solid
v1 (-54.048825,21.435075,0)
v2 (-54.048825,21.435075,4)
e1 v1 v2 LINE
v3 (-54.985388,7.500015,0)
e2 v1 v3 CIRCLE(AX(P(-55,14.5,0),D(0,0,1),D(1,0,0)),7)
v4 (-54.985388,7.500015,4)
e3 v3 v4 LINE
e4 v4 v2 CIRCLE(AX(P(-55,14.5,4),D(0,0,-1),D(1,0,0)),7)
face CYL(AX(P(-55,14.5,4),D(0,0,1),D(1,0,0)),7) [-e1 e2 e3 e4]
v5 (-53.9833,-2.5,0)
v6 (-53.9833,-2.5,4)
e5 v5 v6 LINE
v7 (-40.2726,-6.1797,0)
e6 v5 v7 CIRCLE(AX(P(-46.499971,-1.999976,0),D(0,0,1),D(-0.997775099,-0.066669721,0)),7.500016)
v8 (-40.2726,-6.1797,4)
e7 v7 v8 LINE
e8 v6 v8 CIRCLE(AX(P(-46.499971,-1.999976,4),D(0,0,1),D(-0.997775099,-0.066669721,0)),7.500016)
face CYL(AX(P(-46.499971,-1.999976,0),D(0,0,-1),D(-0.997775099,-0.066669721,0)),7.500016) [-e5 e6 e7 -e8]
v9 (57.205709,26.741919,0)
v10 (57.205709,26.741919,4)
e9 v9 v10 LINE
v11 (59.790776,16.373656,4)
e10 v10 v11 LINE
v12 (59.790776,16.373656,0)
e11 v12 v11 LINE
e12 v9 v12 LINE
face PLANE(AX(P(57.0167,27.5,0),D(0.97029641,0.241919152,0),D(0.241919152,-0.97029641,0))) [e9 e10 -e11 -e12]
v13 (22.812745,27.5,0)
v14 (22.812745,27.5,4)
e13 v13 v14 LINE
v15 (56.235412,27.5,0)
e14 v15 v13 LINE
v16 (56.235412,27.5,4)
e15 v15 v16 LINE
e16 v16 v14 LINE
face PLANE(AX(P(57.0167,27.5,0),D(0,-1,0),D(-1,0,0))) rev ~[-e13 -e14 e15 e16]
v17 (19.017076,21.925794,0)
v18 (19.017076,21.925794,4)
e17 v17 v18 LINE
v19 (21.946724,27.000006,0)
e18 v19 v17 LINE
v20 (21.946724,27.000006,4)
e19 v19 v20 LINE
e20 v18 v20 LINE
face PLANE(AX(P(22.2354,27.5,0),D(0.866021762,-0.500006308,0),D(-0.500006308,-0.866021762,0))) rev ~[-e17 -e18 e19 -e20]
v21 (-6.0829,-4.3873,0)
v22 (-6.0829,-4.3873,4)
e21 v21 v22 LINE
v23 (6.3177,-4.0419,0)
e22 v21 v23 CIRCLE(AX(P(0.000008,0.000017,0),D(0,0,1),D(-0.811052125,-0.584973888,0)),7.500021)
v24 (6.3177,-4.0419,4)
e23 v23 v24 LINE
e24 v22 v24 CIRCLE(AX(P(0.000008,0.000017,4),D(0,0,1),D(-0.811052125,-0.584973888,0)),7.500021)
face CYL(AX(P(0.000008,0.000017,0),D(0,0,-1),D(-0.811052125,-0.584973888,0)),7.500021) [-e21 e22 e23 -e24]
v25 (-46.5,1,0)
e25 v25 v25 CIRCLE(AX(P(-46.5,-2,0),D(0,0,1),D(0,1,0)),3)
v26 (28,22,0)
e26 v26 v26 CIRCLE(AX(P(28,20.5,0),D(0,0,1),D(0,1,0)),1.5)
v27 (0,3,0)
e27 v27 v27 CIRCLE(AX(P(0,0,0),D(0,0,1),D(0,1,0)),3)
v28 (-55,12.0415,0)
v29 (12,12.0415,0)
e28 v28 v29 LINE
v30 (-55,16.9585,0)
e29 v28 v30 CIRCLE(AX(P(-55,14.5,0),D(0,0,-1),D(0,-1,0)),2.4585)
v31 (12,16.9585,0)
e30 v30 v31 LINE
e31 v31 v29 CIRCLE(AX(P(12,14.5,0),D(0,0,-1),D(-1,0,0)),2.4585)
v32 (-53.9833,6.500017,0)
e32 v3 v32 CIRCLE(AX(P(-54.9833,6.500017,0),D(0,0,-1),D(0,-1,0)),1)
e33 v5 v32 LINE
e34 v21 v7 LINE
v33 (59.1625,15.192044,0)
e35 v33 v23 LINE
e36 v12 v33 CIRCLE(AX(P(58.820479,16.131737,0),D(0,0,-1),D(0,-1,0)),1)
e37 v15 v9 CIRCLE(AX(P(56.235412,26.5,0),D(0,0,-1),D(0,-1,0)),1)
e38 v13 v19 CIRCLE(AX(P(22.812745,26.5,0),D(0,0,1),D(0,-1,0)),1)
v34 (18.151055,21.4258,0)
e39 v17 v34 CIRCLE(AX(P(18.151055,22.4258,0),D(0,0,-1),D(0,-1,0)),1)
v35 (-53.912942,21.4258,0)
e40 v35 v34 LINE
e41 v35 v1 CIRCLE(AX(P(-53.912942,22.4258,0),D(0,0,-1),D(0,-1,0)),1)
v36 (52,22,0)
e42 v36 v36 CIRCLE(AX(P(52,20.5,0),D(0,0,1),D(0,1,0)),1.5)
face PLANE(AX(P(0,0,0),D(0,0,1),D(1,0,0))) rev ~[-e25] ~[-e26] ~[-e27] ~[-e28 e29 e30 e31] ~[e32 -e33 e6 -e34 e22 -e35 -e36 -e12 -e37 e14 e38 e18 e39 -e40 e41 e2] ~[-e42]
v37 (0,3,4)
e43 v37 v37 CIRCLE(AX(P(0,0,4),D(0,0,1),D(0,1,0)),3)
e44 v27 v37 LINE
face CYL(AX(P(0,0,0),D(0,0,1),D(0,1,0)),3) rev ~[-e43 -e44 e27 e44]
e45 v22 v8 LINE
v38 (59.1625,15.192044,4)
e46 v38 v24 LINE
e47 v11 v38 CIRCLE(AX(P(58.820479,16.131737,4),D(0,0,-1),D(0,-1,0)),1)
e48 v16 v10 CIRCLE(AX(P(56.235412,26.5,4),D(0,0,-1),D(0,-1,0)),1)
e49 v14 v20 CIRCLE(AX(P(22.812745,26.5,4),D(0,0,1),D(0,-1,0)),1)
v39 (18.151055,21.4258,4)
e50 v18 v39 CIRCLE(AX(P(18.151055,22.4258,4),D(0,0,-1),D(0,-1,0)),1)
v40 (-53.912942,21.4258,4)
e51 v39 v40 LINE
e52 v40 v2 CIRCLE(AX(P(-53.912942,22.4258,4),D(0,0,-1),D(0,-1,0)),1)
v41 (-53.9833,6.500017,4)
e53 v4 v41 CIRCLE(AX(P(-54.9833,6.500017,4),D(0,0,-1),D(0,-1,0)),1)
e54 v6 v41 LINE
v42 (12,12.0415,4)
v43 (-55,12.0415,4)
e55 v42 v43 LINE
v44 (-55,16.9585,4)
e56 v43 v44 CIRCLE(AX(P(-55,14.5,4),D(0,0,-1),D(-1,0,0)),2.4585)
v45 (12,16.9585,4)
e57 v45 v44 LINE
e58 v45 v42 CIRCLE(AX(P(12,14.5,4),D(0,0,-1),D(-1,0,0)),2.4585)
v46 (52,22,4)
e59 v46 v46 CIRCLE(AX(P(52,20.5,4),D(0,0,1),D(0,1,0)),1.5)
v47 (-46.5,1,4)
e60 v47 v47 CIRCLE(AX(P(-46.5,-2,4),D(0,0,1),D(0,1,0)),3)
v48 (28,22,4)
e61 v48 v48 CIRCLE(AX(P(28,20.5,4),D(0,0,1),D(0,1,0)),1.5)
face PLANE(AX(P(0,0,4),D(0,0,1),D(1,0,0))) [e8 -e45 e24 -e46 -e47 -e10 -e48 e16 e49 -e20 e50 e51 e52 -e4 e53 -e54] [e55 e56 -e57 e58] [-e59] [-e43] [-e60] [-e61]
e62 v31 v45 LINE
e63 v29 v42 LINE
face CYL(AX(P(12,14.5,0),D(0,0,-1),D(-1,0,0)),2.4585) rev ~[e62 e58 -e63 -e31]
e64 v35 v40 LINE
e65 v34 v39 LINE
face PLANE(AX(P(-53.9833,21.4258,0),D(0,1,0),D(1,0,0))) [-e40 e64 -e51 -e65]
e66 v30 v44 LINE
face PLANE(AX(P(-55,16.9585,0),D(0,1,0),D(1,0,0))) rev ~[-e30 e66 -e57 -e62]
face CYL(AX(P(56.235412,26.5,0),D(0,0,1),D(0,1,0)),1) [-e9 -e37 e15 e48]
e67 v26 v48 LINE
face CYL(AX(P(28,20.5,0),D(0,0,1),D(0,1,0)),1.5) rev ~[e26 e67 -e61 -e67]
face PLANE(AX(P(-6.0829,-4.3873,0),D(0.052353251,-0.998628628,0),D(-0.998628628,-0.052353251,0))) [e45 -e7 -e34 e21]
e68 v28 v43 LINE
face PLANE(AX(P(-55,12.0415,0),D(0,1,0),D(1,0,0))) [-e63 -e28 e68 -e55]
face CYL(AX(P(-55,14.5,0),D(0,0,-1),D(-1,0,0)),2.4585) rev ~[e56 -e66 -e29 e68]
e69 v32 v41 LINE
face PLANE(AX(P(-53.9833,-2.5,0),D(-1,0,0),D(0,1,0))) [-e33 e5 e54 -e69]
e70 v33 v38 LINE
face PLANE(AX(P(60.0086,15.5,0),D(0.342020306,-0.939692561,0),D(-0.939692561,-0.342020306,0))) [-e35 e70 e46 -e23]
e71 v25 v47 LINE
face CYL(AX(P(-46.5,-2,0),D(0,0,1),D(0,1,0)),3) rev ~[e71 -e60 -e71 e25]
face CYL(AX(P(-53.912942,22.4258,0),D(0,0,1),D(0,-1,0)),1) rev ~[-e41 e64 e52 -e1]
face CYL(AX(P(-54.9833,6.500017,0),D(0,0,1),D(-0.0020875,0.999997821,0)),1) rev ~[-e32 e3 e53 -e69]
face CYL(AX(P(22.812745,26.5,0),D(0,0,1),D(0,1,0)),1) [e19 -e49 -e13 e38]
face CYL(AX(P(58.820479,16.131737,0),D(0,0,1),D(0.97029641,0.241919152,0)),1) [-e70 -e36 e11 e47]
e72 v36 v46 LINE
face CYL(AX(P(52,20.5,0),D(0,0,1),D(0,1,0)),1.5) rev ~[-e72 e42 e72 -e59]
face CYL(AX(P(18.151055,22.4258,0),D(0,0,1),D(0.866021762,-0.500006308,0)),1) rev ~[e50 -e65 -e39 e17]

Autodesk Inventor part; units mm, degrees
ref_plane "YZ Plane" through (0, 0, 0) normal (1, 0, 0) x (0, 1, 0)
ref_plane "XZ Plane" through (0, 0, 0) normal (0, 1, 0) x (-1, 0, 0)
ref_plane "XY Plane" through (0, 0, 0) normal (0, 0, 1) x (1, 0, 0)
sketch "Base" plane through (0, 0, 0) normal (0, 0, 1) x (1, 0, 0)
  arc A0 (-53.9833, -2.5) -> (-40.2726, -6.1797) centre (-46.5, -2) ccw
  line L0 (-6.0829, -4.3873) -> (-40.2726, -6.1797)
  arc A1 (-6.0829, -4.3873) -> (6.3177, -4.0419) centre (0, 0) ccw
  line L1 (60.0086, 15.5) -> (6.3177, -4.0419)
  circle A2 centre (52, 20.5) radius 1.5 construction
  circle A3 centre (28, 20.5) radius 1.5 construction
  line L2 (57.0167, 27.5) -> (60.0086, 15.5)
  line L3 (57.0167, 27.5) -> (-53.9833, 27.5)
  line L4 (-53.9833, -2.5) -> (-53.9833, 27.5)
  line L5 (52, 20.5) -> (28, 20.5) construction
  dimension "d3" = 24
  dimension "d4" = 3
  dimension "d7" = 104
  dimension "d16" = 20
  dimension "d17" = 111
  dimension "d19" = 30
  dimension "d22" = 86.999
  dimension "d25" = 28
  dimension "d26" = 7.5
  dimension "d31" = 27.5
  dimension "d32" = 12
  dimension "d45" = 46.5
  dimension "d46" = 2
  dimension "d47" = 4.5
  dimension "d64" = 7
extrude "BaseFeature" add sketch "Base" along normal blind 4
fillet "EndFilletsFeature" radius 1 2 edges at (60.0086, 15.5, 2) (57.0167, 27.5, 2)
sketch "BaseMountHoles" plane through (0, 0, 0) normal (0, 0, -1) x (-1, 0, 0)
  arc A0 (40.2726, -6.1797) -> (53.9833, -2.5) centre (46.5, -2) ccw projected
  point P0 (0, 0)
hole "BaseMountHolesFeature" at (-46.5, -2, 0) at (0, 0, 0) direction (0, 0, 1) diameter 6 end through all
sketch "CuffMountHoles" plane through (0, 0, 0) normal (0, 0, -1) x (-1, 0, 0)
  circle A0 centre (-52, 20.5) radius 1.5 construction
  circle A1 centre (-28, 20.5) radius 1.5 construction
  point P0 (0, 0)
hole "CuffMountHolesFeature" at (52, 20.5, 0) at (28, 20.5, 0) direction (0, 0, 1) diameter 3 end through all
sketch "ExternalAssemblyGeometry" plane through (0, 0, 4) normal (0, 0, 1) x (1, 0, 0)
  circle A0 centre (-4.2211, 14.5) radius 2.4585 construction
  circle A1 centre (-12.2211, 14.5) radius 2.4585 construction
  circle A2 centre (-33.6105, 14.5) radius 2.4585 construction
  circle A3 centre (-55, 14.5) radius 2.4585 construction
  line L0 (16.9953, 21.5) -> (-152.0047, 21.5) construction
  line L1 (-55, 14.5) -> (12, 14.5) construction
  circle A4 centre (-55, 14.5) radius 7
  line L2 (-53.9833, 27.5) -> (56.2354, 27.5) projected
  line L3 (-53.9833, -2.5) -> (-53.9833, 27.5) projected
  dimension "d57" = 67
  dimension "d72" = 14
  dimension "d73" = 6
  dimension "d74" = 169
  dimension "d75" = 4.917
  dimension "d76" = 8
  dimension "d77" = 1.0167
  dimension "d78" = 21.3895
  dimension "d79" = 21.3895
  dimension "d80" = 70.9786
extrude "MountRailEndFeature" add sketch "ExternalAssemblyGeometry" against normal up to surface (4 mm away)
sketch "MountRail" plane through (0, 0, 0) normal (0, 0, -1) x (-1, 0, 0)
  line L0 (55, 14.5) -> (-12, 14.5) construction
  circle A0 centre (55, 14.5) radius 2.4585 construction
  circle A1 centre (-12, 14.5) radius 2.4585
  circle A2 centre (55, 14.5) radius 2.4585
  line L1 (55, 12.0415) -> (-12, 12.0415)
  line L2 (55, 16.9585) -> (-12, 16.9585)
  point P0 (0, 0)
extrude "MountRailFeature" cut sketch "MountRail" against normal through all
sketch "TopAngleCut" plane through (0, 0, 0) normal (0, 0, -1) x (-1, 0, 0)
  line L0 (53.9833, 27.5) -> (-56.2354, 27.5) construction
  line L1 (-22.2354, 27.5) -> (-18.7284, 21.4258)
  line L2 (53.9833, 21.4258) -> (-18.7284, 21.4258)
  line L3 (-22.2354, 27.5) -> (53.9833, 27.5)
  line L4 (53.9833, 21.4258) -> (53.9833, 27.5)
  line L5 (53.9833, 21.4258) -> (53.9833, 27.5) projected
  point P0 (0, 0)
  point P1 (-57.0167, 27.5)
  dimension "d65" = 120
  dimension "d66" = 34
extrude "TopAngleCutFeature" cut sketch "TopAngleCut" against normal through all
fillet "TopAngleCutFilletsFeature" radius 1 2 edges at (22.2354, 27.5, 2) (18.7284, 21.4258, 2)
fillet "BodyFilletFeature" radius 1 2 edges at (-53.9833, 21.4258, 2) (-53.9833, 7.5742, 2)
properties part number "ForearmLeftEnd"
